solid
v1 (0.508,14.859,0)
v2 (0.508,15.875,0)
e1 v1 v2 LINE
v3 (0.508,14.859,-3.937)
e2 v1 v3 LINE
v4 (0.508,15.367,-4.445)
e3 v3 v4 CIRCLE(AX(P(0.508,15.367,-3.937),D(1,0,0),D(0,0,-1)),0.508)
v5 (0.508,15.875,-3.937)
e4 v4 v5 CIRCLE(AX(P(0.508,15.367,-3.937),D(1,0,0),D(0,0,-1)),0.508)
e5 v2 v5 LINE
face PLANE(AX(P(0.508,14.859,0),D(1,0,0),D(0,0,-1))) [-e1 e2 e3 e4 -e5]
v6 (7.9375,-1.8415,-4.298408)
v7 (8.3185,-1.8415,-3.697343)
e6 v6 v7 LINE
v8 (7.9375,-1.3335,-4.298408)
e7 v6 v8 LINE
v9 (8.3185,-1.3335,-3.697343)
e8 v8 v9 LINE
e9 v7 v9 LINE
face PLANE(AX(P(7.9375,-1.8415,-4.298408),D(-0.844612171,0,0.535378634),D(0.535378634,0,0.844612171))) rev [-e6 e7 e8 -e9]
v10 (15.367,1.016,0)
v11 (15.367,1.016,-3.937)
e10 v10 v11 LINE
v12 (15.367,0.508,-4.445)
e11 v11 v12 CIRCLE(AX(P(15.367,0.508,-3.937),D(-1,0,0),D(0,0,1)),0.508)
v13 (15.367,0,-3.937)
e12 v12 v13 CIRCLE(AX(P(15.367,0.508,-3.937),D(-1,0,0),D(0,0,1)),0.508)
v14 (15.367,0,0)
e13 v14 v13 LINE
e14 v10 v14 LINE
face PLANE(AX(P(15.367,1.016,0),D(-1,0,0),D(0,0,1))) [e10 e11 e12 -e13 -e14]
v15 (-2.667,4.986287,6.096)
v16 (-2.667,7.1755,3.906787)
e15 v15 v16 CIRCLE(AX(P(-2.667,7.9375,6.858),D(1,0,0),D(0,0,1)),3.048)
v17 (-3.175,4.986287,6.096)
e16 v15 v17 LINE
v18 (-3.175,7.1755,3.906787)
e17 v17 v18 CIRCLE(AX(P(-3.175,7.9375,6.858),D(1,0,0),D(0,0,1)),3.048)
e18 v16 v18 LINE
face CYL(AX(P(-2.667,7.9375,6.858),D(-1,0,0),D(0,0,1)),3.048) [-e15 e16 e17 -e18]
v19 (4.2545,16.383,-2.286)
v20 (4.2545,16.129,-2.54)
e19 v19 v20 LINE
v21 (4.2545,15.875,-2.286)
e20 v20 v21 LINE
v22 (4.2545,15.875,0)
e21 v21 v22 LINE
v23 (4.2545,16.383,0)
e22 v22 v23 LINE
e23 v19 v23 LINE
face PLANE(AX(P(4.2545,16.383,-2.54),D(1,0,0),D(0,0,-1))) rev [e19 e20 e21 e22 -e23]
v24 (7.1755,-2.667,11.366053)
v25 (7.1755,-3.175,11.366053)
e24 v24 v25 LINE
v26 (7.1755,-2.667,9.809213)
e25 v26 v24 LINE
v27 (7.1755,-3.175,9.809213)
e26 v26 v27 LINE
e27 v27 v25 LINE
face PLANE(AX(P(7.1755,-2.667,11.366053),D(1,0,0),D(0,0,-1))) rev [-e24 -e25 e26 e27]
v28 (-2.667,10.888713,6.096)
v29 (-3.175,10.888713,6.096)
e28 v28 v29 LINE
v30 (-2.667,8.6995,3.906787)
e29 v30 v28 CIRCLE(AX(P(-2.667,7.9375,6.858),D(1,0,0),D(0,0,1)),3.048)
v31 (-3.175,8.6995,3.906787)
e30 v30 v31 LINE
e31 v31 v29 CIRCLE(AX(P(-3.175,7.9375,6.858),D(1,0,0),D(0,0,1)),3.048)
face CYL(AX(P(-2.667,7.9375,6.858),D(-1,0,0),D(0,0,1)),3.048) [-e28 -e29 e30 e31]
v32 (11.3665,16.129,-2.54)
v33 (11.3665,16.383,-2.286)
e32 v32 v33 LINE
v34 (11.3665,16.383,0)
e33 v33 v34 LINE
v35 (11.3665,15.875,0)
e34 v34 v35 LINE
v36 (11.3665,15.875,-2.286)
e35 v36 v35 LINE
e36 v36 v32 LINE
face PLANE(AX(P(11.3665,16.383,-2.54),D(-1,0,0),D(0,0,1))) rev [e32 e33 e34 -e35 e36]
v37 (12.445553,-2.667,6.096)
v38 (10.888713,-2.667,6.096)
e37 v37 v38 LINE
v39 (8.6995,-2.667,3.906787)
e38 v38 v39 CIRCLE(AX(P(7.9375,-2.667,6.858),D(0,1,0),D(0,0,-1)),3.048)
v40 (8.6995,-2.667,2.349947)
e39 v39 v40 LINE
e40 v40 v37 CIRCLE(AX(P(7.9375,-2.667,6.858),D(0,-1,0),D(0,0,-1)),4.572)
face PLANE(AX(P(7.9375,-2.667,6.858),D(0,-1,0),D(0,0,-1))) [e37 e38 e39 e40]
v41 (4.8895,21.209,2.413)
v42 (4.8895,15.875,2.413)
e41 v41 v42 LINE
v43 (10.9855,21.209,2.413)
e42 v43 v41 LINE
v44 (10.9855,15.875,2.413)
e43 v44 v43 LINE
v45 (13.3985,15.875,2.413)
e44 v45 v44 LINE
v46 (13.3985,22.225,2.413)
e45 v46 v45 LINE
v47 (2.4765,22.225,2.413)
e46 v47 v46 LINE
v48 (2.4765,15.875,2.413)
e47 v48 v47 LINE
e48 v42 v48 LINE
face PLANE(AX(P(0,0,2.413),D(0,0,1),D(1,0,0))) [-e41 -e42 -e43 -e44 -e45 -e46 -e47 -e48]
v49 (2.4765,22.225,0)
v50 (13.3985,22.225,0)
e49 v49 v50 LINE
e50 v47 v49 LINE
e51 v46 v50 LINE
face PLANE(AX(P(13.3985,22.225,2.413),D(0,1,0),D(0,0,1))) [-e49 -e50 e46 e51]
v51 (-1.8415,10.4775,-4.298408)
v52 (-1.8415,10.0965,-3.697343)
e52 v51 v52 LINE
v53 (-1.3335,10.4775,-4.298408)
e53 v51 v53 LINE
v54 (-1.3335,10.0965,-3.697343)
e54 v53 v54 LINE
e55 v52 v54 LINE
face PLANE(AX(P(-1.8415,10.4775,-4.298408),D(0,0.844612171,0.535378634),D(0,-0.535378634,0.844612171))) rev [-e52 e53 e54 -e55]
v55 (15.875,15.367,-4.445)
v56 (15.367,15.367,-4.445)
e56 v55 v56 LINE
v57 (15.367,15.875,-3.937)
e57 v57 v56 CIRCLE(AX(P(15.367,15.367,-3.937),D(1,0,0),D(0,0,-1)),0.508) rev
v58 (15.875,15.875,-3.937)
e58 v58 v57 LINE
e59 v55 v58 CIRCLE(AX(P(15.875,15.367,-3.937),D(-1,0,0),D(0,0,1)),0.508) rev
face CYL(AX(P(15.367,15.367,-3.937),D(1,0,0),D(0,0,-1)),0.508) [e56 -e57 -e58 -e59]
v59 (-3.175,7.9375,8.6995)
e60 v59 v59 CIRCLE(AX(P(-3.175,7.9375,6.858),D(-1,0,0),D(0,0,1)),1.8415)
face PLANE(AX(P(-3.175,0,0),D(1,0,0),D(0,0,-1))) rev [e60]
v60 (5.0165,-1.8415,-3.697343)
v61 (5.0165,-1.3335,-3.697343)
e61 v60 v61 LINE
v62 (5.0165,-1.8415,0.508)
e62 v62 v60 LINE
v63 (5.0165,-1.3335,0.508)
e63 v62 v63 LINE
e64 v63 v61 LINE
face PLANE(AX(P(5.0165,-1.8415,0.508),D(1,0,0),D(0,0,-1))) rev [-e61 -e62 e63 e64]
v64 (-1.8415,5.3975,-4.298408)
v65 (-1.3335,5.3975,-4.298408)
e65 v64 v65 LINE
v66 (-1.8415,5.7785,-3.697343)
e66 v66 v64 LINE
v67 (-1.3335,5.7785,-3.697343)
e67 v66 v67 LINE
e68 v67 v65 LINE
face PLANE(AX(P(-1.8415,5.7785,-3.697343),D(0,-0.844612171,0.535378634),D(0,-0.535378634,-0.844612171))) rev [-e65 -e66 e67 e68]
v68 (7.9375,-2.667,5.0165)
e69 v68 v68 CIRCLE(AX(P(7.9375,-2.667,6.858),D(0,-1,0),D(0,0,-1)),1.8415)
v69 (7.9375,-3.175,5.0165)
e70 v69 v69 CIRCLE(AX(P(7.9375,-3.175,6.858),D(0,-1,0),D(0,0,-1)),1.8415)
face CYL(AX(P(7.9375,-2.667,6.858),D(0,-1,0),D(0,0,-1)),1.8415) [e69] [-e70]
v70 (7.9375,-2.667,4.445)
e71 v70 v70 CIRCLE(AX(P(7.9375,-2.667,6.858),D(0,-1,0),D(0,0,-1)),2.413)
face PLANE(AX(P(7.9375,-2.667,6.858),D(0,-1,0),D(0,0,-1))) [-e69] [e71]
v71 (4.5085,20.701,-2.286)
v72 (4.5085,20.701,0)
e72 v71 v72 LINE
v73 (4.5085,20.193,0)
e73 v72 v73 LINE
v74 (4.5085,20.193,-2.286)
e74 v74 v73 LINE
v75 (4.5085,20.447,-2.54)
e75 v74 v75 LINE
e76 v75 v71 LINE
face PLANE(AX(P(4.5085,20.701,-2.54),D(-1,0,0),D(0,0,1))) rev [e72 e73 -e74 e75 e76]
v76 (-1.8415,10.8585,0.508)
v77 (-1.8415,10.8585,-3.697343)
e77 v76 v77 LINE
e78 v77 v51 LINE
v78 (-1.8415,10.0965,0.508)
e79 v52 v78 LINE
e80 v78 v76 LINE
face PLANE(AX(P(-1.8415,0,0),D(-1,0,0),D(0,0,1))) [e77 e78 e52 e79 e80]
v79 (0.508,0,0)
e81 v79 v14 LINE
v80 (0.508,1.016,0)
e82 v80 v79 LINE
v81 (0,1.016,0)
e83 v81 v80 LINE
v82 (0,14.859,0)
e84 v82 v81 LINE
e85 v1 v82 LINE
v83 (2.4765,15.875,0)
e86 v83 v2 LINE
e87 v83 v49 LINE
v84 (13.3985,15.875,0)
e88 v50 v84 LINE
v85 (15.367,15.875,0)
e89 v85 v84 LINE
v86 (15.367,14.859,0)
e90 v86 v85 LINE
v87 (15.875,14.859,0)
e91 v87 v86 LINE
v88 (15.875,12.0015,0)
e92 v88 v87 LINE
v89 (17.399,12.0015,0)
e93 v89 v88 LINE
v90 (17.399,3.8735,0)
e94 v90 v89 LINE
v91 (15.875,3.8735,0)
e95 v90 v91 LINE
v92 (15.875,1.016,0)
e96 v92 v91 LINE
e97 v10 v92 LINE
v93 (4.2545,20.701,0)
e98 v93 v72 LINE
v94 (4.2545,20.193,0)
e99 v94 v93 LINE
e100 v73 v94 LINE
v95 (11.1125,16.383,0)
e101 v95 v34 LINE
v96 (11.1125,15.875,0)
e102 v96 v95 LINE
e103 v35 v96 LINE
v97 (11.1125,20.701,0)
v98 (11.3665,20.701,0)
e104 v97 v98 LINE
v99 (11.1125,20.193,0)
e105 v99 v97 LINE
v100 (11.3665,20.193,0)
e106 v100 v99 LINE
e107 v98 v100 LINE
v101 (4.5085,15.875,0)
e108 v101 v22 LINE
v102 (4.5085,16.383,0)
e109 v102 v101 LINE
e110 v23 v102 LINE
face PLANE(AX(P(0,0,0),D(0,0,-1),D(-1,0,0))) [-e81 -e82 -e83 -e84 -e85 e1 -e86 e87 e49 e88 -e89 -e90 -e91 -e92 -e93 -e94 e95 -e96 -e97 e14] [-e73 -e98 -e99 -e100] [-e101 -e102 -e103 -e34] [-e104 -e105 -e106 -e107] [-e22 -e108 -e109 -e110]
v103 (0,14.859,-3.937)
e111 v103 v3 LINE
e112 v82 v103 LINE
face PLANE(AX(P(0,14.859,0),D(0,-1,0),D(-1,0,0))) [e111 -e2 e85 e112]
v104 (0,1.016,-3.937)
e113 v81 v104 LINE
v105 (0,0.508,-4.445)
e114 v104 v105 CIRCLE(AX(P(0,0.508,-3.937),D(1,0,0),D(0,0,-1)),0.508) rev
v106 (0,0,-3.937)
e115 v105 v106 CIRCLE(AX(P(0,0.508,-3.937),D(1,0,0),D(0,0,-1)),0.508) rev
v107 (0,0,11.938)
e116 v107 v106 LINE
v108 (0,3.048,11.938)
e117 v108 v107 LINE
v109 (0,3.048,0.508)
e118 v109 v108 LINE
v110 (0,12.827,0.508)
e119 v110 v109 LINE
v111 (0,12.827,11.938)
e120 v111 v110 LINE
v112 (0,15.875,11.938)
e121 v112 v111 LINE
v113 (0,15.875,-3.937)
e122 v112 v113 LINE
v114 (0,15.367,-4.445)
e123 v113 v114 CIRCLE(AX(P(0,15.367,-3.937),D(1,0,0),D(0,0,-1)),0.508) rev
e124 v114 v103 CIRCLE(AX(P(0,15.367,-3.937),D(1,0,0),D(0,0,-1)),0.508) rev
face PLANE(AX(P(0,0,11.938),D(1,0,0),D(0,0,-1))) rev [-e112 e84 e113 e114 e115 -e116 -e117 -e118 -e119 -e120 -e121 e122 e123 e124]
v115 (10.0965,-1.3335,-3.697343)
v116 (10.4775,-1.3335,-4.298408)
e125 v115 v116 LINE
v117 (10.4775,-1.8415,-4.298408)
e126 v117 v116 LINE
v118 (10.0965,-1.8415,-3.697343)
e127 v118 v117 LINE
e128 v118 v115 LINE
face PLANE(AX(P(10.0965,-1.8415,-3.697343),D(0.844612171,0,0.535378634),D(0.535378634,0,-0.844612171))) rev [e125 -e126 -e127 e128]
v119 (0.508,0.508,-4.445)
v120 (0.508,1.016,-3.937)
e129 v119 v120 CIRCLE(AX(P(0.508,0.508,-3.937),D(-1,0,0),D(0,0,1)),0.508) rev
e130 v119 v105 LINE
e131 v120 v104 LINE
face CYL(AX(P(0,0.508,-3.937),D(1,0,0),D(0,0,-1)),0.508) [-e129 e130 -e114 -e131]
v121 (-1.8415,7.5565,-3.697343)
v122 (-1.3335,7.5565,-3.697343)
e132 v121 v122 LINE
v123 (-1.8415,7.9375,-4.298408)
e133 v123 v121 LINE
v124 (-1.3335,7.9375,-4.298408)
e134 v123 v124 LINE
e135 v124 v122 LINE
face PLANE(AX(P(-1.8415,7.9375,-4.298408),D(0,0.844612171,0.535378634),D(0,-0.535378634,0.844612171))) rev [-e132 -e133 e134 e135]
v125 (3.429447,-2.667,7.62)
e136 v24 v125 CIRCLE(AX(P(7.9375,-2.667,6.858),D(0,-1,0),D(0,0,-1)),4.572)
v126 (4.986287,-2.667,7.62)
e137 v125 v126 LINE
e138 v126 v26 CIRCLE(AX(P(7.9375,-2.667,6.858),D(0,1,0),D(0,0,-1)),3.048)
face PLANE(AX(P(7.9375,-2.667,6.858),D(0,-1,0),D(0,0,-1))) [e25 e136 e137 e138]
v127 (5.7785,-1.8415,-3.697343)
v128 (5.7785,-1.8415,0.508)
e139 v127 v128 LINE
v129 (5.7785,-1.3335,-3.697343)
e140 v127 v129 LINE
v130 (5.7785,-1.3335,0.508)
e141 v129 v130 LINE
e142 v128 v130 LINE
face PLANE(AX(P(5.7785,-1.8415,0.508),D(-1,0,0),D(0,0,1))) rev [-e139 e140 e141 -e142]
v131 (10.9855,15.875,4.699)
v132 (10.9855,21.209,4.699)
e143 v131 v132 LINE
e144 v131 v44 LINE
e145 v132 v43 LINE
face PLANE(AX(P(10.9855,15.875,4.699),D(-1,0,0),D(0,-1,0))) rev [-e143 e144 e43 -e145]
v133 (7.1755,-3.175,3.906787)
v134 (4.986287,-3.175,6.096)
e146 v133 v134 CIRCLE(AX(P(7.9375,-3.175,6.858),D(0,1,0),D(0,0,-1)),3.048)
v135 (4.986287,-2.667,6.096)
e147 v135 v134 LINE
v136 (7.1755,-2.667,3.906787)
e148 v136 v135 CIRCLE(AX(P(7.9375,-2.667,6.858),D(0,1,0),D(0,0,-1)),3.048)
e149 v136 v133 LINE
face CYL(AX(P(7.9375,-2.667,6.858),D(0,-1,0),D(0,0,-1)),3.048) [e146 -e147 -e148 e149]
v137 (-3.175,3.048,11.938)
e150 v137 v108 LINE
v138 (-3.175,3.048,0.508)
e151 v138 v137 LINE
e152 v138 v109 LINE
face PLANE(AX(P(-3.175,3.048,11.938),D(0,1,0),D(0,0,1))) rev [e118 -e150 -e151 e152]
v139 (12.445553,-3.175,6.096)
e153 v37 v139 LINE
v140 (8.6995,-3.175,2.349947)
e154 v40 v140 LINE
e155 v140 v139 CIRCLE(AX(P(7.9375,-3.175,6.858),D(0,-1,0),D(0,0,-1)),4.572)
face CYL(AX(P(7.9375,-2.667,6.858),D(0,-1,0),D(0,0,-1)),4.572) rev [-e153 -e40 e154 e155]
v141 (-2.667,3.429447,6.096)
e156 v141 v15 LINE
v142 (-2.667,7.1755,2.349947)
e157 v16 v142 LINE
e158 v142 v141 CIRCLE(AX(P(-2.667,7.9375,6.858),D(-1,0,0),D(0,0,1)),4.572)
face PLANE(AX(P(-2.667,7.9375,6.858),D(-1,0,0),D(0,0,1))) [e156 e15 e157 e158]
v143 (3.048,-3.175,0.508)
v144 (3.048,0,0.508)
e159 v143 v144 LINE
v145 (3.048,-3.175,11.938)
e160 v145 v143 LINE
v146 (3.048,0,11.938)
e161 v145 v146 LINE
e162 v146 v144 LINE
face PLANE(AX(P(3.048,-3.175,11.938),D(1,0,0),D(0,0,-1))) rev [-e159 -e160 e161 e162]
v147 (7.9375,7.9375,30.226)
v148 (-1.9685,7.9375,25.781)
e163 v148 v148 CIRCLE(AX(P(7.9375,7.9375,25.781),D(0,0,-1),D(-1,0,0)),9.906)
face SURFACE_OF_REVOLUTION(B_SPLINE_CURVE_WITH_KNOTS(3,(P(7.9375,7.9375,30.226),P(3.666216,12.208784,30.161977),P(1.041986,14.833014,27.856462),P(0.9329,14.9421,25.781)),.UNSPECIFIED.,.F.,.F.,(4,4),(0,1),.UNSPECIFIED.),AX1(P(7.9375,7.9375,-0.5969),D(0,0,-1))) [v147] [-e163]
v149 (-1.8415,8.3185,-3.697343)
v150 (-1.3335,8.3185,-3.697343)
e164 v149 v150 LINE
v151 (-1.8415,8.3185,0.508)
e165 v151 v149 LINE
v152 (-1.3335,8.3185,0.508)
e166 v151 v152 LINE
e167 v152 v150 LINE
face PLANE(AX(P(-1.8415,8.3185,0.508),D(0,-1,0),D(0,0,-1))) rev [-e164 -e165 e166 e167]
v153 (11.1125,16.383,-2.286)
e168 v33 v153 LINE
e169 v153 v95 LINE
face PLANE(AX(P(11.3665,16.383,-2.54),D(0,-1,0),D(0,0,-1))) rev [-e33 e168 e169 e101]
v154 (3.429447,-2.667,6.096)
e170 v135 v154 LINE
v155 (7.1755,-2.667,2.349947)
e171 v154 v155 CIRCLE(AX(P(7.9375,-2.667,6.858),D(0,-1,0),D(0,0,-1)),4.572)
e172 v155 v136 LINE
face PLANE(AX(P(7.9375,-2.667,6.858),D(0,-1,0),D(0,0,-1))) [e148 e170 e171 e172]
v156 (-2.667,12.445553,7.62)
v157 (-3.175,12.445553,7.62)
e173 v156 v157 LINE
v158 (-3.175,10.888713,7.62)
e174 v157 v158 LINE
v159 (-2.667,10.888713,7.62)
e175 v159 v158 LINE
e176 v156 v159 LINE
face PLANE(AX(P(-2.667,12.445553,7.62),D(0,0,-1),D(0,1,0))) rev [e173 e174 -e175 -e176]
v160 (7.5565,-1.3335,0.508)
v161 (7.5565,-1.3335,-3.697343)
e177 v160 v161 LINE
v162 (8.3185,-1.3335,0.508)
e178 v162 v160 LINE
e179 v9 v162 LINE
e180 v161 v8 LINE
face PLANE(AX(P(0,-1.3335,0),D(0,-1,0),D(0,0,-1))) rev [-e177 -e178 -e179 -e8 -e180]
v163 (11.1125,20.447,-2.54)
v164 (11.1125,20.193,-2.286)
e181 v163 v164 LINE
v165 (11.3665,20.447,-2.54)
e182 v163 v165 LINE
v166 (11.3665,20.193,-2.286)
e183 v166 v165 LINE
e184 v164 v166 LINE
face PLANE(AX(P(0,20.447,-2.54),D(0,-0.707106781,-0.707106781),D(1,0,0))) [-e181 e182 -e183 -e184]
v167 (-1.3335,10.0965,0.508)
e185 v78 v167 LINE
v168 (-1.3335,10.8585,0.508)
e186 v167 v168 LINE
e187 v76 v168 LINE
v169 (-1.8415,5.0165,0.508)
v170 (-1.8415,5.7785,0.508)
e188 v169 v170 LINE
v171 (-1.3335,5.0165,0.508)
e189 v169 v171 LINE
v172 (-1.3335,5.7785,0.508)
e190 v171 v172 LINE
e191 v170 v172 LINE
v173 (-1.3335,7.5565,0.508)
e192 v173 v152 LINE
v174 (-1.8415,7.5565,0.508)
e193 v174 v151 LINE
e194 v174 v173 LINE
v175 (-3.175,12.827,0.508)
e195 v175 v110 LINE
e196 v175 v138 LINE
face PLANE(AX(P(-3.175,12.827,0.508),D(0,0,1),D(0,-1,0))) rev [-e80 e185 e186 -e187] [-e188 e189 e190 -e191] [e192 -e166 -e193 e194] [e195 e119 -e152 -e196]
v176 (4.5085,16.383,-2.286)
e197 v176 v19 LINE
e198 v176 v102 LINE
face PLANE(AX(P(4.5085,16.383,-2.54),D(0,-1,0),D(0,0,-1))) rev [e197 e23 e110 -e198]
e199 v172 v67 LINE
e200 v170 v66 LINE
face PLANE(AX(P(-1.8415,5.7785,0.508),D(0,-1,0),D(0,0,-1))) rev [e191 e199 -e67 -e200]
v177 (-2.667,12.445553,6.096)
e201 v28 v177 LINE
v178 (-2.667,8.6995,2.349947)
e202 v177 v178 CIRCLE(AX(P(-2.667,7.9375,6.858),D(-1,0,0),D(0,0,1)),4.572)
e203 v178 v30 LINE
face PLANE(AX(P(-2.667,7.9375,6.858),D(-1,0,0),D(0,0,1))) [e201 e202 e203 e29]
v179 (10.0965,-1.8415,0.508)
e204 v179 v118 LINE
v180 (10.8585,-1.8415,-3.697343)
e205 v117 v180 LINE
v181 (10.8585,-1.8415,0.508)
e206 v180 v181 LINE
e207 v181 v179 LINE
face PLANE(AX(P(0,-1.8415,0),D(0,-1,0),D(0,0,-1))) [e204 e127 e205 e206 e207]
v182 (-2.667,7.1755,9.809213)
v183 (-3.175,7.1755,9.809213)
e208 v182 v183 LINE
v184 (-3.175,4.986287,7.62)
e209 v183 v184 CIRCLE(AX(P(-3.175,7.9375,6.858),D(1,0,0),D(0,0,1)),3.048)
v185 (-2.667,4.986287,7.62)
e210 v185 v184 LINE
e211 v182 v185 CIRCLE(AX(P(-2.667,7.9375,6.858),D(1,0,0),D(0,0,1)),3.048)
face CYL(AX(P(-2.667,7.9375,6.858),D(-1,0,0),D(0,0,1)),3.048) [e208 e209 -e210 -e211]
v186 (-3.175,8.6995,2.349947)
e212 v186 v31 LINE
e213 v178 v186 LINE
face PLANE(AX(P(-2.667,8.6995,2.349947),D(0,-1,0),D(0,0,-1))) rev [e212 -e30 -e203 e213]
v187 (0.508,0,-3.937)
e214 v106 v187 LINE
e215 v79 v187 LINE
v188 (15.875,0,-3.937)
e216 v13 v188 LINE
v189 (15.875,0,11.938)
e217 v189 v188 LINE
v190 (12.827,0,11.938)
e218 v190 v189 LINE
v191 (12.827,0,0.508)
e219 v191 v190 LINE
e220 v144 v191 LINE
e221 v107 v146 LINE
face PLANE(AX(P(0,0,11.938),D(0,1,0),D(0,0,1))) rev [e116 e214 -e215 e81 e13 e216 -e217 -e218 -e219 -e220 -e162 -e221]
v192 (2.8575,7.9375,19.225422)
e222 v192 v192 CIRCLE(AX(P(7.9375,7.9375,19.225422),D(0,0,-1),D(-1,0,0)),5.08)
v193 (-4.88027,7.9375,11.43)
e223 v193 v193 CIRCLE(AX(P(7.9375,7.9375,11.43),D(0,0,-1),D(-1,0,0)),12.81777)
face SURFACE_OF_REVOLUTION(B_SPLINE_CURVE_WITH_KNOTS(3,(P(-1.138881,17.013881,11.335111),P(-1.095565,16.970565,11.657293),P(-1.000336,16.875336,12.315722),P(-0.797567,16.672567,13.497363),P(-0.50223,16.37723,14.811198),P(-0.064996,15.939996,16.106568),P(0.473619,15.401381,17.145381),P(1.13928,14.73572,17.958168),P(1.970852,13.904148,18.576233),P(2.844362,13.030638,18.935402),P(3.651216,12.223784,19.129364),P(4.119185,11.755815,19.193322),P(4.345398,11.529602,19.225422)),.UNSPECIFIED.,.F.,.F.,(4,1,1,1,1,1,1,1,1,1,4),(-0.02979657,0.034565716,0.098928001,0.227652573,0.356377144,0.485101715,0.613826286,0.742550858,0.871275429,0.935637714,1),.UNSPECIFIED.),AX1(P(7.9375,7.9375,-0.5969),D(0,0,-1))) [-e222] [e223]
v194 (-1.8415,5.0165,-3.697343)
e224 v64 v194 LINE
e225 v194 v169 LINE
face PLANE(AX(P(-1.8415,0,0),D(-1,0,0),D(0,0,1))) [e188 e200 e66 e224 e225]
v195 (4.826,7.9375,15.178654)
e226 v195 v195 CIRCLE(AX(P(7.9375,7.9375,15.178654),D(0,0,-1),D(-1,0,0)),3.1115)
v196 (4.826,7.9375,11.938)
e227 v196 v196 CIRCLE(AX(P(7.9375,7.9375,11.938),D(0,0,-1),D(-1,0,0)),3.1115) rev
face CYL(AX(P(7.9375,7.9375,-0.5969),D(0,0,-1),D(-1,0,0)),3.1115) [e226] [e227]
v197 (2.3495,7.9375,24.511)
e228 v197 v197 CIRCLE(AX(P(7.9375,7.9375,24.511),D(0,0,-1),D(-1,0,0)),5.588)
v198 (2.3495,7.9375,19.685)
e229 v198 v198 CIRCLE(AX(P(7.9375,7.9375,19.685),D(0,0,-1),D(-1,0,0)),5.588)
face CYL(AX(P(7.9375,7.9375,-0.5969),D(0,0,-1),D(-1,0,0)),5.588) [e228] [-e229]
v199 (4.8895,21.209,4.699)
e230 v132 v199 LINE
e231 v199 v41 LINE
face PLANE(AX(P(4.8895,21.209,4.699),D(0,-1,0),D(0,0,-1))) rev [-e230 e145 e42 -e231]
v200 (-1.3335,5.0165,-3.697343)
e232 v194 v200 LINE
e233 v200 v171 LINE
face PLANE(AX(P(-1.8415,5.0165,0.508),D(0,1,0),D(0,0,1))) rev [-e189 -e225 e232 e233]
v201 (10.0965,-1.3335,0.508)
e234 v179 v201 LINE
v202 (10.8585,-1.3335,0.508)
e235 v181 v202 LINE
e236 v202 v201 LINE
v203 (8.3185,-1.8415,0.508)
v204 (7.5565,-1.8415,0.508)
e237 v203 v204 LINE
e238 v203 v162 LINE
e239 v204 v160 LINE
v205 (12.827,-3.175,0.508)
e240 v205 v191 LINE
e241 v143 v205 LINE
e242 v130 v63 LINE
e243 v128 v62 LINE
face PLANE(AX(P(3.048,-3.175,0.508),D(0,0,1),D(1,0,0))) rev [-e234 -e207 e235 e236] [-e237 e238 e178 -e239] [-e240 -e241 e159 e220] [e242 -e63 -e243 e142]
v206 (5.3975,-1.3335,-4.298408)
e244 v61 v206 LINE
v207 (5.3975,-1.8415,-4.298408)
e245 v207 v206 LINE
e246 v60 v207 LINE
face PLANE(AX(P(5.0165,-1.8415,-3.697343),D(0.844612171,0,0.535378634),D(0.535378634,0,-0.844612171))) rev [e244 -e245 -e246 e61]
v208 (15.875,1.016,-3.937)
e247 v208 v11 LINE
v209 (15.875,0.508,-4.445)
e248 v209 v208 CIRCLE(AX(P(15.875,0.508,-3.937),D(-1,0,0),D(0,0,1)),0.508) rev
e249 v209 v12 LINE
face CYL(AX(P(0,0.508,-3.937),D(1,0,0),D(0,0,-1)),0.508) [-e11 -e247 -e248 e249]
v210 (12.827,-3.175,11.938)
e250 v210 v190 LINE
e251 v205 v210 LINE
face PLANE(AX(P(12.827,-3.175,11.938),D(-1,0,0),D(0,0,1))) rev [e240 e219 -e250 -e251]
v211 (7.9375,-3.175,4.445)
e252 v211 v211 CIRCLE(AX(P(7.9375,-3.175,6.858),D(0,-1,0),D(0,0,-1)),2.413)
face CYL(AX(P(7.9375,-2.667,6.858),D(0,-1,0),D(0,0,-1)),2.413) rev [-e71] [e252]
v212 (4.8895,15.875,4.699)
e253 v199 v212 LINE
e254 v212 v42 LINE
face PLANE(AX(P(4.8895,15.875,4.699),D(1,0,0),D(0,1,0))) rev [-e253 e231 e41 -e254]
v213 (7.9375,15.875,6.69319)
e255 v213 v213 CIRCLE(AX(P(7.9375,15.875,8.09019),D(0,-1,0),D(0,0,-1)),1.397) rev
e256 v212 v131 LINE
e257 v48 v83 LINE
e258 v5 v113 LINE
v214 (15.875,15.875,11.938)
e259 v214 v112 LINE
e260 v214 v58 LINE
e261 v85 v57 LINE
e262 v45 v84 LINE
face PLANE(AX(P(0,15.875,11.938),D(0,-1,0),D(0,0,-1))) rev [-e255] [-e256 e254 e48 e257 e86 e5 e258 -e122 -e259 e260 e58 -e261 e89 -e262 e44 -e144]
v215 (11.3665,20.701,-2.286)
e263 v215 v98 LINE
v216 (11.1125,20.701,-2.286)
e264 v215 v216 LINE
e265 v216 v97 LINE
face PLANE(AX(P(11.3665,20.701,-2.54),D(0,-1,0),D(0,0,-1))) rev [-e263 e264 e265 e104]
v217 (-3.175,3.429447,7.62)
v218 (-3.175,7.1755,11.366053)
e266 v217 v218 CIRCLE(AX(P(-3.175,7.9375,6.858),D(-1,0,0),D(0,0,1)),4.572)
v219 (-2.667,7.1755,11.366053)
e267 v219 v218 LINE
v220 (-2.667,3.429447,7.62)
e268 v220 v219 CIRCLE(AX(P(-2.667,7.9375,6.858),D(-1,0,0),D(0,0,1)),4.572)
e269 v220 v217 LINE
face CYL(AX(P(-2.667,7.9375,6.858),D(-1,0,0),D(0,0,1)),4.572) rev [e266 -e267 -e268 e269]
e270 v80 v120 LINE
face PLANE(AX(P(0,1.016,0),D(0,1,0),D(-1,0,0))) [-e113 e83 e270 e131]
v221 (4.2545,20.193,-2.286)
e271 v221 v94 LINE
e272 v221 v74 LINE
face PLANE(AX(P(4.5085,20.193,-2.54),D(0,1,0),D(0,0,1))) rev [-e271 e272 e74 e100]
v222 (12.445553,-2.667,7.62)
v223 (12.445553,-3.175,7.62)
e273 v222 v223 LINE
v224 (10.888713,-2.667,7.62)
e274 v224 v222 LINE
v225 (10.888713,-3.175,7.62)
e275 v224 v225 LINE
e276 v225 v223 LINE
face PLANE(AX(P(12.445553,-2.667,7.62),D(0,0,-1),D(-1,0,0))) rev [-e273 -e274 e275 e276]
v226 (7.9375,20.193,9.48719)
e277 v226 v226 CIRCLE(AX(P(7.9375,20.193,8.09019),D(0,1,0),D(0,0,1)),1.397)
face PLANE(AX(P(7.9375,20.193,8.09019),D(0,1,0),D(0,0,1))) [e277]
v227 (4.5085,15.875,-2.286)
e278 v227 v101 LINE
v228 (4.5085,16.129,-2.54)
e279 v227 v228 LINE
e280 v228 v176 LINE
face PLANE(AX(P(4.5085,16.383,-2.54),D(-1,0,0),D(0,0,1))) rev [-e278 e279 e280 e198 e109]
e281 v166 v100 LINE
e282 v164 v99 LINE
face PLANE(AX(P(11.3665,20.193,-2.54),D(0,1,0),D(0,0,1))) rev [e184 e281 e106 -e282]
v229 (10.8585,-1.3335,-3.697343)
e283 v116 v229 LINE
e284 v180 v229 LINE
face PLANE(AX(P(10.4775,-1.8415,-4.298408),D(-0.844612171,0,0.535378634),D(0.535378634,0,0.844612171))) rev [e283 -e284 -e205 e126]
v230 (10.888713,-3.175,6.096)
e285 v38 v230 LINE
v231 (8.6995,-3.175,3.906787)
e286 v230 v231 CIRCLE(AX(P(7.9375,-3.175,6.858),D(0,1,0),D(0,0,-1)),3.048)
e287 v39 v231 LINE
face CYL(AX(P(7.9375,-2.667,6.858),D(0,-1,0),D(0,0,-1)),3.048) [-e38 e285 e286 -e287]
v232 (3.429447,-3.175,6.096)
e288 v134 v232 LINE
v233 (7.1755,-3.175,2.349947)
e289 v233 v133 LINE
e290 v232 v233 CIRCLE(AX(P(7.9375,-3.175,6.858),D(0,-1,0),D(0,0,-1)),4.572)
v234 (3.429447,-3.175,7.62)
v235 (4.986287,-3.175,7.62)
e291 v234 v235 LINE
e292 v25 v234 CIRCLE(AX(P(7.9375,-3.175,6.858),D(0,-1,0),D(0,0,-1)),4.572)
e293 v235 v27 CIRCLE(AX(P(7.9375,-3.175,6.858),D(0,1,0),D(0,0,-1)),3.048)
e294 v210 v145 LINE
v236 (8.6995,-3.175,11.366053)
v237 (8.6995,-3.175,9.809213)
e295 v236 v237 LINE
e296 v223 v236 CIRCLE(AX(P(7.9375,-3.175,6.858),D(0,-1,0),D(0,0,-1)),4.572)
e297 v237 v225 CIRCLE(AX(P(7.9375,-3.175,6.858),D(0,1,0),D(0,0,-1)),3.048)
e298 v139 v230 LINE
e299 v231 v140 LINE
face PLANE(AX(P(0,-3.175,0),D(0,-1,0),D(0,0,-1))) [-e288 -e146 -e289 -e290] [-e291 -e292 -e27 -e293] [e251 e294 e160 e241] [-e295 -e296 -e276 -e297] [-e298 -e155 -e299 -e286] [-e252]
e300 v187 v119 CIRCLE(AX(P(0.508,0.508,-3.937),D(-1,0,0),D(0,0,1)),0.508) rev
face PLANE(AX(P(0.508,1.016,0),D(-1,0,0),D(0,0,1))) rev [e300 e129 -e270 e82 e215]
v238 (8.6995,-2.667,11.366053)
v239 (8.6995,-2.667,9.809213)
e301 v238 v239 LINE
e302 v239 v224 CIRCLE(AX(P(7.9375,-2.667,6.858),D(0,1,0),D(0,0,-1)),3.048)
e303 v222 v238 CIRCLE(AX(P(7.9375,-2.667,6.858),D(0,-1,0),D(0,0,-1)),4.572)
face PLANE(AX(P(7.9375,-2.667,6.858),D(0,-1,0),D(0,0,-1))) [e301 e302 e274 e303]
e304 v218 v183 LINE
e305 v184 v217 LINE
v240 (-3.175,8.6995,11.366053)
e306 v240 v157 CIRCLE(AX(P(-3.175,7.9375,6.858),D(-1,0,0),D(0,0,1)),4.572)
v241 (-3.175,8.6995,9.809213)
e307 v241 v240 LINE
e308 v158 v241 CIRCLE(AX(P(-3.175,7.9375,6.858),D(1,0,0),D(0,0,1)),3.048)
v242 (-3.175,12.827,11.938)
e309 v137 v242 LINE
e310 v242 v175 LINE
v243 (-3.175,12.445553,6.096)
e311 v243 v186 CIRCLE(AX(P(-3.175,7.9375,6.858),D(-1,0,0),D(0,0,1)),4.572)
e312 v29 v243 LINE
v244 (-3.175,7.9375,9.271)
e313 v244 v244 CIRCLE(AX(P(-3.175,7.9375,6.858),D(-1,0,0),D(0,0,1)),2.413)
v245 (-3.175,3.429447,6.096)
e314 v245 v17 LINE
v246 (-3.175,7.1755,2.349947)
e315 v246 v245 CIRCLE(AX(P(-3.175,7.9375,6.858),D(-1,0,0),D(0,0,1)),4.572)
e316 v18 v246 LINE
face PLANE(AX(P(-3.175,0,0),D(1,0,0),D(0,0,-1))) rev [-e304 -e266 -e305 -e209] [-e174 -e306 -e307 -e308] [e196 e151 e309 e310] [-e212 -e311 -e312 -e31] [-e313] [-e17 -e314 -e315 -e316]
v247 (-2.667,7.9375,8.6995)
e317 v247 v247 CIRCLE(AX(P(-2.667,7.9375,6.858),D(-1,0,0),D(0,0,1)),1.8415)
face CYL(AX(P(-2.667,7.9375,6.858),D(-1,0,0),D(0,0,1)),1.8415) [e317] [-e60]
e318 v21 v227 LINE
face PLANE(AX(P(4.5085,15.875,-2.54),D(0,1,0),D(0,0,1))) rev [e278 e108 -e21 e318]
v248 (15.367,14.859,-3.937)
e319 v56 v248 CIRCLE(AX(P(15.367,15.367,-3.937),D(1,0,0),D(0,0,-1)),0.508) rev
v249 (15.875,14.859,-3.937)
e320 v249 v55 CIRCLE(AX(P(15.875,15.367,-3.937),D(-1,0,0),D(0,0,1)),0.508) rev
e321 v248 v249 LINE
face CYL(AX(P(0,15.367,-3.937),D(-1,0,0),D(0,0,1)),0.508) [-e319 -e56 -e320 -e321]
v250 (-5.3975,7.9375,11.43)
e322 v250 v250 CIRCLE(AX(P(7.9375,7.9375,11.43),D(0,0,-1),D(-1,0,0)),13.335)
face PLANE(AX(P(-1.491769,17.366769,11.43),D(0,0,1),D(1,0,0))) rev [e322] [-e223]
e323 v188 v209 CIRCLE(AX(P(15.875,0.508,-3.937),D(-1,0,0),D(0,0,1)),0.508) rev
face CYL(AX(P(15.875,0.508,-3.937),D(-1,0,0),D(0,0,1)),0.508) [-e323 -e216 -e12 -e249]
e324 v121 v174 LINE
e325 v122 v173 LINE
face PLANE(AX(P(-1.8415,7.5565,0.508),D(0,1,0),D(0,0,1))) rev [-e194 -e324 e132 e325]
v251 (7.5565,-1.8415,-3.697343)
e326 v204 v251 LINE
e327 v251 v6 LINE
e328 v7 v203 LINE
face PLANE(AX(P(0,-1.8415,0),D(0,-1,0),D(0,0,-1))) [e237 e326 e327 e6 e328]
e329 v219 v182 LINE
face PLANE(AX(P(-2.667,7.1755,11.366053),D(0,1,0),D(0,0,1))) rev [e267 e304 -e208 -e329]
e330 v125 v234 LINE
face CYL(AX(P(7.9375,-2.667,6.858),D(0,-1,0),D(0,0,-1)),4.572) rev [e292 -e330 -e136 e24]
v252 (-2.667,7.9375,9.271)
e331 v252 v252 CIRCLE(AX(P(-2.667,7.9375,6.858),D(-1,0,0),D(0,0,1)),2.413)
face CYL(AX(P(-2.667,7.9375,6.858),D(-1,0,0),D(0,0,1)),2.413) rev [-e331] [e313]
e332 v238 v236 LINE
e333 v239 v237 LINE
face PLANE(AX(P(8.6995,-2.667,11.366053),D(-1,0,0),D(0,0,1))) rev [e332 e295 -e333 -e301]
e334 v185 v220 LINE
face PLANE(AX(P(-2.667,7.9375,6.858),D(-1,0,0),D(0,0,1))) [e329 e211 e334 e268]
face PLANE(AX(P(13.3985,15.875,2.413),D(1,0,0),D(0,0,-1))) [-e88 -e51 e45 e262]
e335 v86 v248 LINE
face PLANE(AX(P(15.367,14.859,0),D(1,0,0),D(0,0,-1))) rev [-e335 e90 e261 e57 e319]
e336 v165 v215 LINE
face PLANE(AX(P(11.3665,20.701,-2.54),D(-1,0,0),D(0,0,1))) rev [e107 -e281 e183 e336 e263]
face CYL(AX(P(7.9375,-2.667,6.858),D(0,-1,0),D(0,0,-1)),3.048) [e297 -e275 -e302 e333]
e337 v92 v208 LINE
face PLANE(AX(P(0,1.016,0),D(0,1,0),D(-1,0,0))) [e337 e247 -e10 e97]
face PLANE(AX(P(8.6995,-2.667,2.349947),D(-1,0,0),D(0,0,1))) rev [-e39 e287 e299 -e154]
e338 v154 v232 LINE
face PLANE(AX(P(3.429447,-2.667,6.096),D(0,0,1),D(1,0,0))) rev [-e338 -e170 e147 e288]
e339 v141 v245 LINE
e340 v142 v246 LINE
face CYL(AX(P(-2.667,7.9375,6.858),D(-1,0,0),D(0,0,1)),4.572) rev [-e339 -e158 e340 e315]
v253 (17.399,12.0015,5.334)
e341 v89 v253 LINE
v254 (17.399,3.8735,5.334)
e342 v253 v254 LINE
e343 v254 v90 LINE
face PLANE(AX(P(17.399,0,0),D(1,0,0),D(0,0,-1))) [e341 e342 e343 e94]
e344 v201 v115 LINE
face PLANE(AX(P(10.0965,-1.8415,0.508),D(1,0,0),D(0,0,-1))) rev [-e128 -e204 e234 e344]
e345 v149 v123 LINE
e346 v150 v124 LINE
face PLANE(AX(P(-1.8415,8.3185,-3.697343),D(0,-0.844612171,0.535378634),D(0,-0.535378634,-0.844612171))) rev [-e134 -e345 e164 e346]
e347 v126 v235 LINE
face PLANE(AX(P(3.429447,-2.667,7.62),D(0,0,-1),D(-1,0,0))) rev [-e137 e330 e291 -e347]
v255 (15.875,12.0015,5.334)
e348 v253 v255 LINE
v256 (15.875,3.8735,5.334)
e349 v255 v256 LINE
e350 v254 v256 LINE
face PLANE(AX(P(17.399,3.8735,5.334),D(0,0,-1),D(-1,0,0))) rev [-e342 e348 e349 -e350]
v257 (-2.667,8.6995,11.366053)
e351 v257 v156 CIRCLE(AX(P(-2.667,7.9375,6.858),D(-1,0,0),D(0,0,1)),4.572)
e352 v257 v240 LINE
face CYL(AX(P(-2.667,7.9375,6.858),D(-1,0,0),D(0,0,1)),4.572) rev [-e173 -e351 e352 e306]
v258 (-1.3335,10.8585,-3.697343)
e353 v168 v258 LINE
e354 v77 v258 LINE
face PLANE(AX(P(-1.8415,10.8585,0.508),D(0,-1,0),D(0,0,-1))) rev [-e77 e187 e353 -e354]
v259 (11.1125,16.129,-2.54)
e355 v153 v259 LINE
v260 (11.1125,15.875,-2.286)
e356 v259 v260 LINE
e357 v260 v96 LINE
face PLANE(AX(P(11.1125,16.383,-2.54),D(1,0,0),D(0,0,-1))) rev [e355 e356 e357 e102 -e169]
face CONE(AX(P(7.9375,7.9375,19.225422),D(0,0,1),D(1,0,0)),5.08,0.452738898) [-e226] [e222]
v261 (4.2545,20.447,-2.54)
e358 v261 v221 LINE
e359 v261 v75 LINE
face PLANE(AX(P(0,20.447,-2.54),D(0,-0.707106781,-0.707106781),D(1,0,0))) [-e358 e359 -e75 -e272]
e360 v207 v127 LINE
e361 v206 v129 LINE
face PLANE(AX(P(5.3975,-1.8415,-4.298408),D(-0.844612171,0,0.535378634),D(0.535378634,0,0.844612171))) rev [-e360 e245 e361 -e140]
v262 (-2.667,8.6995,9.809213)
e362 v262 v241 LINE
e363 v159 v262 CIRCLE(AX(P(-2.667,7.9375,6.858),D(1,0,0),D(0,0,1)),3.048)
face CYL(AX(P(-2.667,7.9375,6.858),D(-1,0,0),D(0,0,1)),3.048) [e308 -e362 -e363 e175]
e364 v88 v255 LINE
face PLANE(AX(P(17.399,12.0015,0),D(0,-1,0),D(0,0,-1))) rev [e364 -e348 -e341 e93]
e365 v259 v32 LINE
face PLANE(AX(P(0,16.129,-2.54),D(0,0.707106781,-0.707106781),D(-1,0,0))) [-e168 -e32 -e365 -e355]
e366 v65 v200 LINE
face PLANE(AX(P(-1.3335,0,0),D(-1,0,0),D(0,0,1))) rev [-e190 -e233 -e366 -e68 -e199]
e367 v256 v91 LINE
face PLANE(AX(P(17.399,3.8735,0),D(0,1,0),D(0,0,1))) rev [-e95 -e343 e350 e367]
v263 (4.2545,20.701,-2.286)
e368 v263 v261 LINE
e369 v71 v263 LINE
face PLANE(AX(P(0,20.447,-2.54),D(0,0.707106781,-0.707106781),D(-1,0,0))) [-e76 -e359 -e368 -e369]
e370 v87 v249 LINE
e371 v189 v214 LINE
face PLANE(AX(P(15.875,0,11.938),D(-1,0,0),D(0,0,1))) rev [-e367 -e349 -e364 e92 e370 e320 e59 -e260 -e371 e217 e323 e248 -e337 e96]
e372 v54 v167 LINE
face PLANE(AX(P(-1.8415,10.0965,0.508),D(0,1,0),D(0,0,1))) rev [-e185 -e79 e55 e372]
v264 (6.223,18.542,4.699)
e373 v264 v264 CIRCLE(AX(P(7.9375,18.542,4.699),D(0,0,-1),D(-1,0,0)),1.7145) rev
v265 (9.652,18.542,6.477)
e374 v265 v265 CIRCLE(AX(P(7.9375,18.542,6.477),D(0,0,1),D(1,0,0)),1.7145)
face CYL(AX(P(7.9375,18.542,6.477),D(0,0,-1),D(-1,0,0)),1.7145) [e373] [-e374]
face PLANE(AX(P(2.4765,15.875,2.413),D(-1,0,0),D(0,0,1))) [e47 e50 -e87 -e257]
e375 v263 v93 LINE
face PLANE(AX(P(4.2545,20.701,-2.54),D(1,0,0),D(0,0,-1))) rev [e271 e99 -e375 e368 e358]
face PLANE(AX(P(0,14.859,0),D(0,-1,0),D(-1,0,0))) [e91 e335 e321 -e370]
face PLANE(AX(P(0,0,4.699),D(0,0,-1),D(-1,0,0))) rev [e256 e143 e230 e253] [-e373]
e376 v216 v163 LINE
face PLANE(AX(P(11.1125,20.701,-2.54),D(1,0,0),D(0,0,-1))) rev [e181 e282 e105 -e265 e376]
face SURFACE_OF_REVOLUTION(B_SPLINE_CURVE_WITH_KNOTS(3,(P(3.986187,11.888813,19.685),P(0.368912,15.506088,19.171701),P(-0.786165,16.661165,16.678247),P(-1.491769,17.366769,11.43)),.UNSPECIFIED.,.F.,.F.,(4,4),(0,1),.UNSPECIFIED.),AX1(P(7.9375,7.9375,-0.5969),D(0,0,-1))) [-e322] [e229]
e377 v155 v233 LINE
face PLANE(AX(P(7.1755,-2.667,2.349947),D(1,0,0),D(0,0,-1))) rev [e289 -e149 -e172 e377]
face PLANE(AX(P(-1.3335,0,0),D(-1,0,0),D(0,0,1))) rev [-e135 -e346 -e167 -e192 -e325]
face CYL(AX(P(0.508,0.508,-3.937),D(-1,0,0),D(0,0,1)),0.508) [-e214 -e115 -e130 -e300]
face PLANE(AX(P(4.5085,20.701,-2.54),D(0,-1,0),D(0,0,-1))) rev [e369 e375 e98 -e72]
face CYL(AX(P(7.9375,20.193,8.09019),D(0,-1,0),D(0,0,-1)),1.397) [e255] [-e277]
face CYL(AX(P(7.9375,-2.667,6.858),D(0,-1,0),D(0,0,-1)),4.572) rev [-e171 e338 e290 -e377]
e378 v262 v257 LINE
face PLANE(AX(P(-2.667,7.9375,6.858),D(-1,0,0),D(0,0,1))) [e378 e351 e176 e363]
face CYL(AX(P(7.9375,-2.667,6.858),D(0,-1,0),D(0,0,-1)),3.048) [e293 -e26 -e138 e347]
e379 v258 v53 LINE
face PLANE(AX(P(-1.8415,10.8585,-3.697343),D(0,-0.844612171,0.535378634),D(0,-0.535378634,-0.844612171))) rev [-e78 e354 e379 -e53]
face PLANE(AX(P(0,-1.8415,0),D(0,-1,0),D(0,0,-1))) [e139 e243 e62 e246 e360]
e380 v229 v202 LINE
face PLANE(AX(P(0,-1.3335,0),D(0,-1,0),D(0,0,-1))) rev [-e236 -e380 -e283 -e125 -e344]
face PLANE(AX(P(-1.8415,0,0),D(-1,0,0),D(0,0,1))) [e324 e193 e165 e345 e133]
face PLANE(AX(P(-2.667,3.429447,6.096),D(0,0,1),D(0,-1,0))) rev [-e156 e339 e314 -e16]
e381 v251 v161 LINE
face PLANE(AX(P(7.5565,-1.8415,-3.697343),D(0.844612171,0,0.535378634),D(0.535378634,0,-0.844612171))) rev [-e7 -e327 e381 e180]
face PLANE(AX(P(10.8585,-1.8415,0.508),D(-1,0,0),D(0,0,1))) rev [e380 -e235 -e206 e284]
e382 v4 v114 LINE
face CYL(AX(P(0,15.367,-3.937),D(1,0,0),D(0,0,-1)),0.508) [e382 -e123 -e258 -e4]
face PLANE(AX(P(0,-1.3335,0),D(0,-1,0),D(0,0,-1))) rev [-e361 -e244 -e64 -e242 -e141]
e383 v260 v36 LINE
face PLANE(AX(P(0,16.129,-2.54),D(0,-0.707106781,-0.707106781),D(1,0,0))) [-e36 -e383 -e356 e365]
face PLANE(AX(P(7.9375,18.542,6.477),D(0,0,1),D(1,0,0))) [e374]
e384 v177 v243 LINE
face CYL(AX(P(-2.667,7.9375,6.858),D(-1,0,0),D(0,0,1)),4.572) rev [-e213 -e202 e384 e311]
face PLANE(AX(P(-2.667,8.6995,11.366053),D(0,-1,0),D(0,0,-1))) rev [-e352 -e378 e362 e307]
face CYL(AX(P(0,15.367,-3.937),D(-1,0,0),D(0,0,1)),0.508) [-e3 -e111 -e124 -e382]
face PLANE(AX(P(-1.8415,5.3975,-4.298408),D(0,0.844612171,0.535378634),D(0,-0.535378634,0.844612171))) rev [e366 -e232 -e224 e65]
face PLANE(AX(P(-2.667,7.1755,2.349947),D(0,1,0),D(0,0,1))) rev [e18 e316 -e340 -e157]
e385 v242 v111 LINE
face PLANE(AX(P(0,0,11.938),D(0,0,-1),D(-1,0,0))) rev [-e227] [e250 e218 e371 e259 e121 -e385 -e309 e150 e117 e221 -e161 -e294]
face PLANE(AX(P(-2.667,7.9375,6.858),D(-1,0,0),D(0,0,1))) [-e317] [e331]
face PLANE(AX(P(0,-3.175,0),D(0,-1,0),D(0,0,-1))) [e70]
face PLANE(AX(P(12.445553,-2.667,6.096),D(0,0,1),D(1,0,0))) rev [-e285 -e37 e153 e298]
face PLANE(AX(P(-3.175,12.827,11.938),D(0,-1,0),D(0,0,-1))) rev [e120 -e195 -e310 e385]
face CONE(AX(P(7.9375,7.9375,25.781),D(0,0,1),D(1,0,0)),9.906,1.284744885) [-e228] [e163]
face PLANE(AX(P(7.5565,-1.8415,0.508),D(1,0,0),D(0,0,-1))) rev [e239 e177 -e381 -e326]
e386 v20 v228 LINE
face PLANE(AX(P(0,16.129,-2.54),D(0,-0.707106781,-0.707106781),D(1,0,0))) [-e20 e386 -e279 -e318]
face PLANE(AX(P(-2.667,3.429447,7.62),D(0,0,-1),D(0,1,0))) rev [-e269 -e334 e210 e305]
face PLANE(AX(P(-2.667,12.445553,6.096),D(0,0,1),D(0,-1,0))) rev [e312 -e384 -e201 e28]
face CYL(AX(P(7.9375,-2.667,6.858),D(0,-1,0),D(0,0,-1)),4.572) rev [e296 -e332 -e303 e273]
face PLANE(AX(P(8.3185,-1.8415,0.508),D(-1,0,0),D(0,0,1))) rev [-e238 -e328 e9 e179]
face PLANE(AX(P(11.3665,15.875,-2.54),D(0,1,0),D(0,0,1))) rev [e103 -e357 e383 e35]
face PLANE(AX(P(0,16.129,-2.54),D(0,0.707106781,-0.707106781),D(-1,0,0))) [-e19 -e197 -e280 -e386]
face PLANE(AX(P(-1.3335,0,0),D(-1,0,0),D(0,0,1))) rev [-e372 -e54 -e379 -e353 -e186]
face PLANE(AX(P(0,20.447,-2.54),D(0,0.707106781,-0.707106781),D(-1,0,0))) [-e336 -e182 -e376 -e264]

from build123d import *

# Parameters (mm, degrees)
SKETCH1_W            = 15.875
SKETCH1_H            = 15.875
BOSS_EXTRUDE1_DEPTH  = 11.938
SKETCH2_W            = 10.922
SKETCH2_H            = 6.35
BOSS_EXTRUDE2_DEPTH  = 2.413
SKETCH3_W            = 5.334
SKETCH3_H            = 8.128
BOSS_EXTRUDE3_DEPTH  = 1.524
SKETCH4_W            = 6.096
SKETCH4_H            = 5.334
BOSS_EXTRUDE4_DEPTH  = 2.286
SKETCH5_R            = 1.7145
BOSS_EXTRUDE5_DEPTH  = 1.778
SKETCH6_R            = 1.397
BOSS_EXTRUDE6_DEPTH  = 4.318
SKETCH7_W            = 9.779
SKETCH7_H            = 11.43
BOSS_EXTRUDE7_DEPTH  = 3.175
SKETCH8_W            = 11.43
SKETCH8_H            = 9.779
BOSS_EXTRUDE8_DEPTH  = 3.175
SKETCH9_R            = 2.413
SKETCH9_R_2          = 1.8415
CUT_EXTRUDE1_DEPTH   = 0.508
SKETCH10_R           = 2.413
SKETCH10_R_2         = 1.8415
CUT_EXTRUDE2_DEPTH   = 0.508
SKETCH12_W           = 0.508
SKETCH12_H           = 4.445
EXTRUDE_THIN1_DEPTH  = 1.016
SKETCH13_W           = 0.508
SKETCH13_H           = 4.445
EXTRUDE_THIN2_DEPTH  = 1.016
FILLET1_R            = 0.508
BOSS_EXTRUDE9_DEPTH  = 0.254
BOSS_EXTRUDE10_DEPTH = 0.254
SKETCH16_W           = 0.254
SKETCH16_H           = 0.508
BOSS_EXTRUDE11_DEPTH = 2.54
CHAMFER1_SIZE        = 0.254


with BuildPart() as part:
    # Sketch1 → Boss-Extrude1 (new body)
    with BuildSketch(Plane.XY):
        with Locations((7.9375, 7.9375)):
            Rectangle(SKETCH1_W, SKETCH1_H)
    extrude(amount=BOSS_EXTRUDE1_DEPTH)

    # Sketch2 → Boss-Extrude2 (add)
    with BuildSketch(Plane(origin=(0, 0, 0), x_dir=(-1, 0, 0), z_dir=(0, 0, -1))):
        with Locations((-7.9375, 19.05)):
            Rectangle(SKETCH2_W, SKETCH2_H)
    extrude(amount=-BOSS_EXTRUDE2_DEPTH)

    # Sketch3 → Boss-Extrude3 (add)
    with BuildSketch(Plane(origin=(15.875, 0, 0), x_dir=(0, 0, -1), z_dir=(1, 0, 0))):
        with Locations((-2.667, 7.9375)):
            Rectangle(SKETCH3_W, SKETCH3_H)
    extrude(amount=BOSS_EXTRUDE3_DEPTH)

    # Sketch4 → Boss-Extrude4 (add)
    with BuildSketch(Plane.XY.offset(2.413)):
        with Locations((7.9375, 18.542)):
            Rectangle(SKETCH4_W, SKETCH4_H)
    extrude(amount=BOSS_EXTRUDE4_DEPTH)

    # Sketch5 → Boss-Extrude5 (add)
    with BuildSketch(Plane.XY.offset(4.699)):
        with Locations(Location((7.9375, 18.542, 0), (0, 0, 180))):
            Circle(SKETCH5_R)
    extrude(amount=BOSS_EXTRUDE5_DEPTH)

    # Sketch6 → Boss-Extrude6 (add)
    with BuildSketch(Plane(origin=(0, 15.875, 0), x_dir=(1, 0, 0), z_dir=(0, 1, 0))):
        with Locations(Location((7.9375, -8.090189982, 0), (0, 0, 90))):
            Circle(SKETCH6_R)
    extrude(amount=BOSS_EXTRUDE6_DEPTH)



with BuildPart() as body_2:
    # Sketch7 → Boss-Extrude7 (new body)
    with BuildSketch(Plane.XZ):
        with Locations((7.9375, 6.223)):
            Rectangle(SKETCH7_W, SKETCH7_H)
    extrude(amount=BOSS_EXTRUDE7_DEPTH)

    # Sketch10 → Cut-Extrude2 (cut)
    # profile 1 of 5: a face of its own
    with BuildSketch(Plane.XZ.offset(3.175)):
        with Locations(Location((7.9375, 6.858, 0), (0, 0, 270))):
            Circle(SKETCH10_R)
        with Locations(Location((7.9375, 6.858, 0), (0, 0, 270))):
            Circle(SKETCH10_R_2, mode=Mode.SUBTRACT)
    # profile 2 of 5: a face of its own
    with BuildSketch(Plane.XZ.offset(3.175)):
        with BuildLine():
            Line((3.429447205, 7.62), (4.98628669, 7.62))
            ThreePointArc((4.98628669, 7.62), (5.782238531, 9.013261469), (7.1755, 9.80921331))
            Line((7.1755, 9.80921331), (7.1755, 11.366052795))
            ThreePointArc((7.1755, 11.366052795), (4.704607796, 10.090892204), (3.429447205, 7.62))
        make_face()
    # profile 3 of 5: a face of its own
    with BuildSketch(Plane.XZ.offset(3.175)):
        with BuildLine():
            Line((3.429447205, 6.096), (4.98628669, 6.096))
            ThreePointArc((4.98628669, 6.096), (5.782238531, 4.702738531), (7.1755, 3.90678669))
            Line((7.1755, 3.90678669), (7.1755, 2.349947205))
            ThreePointArc((7.1755, 2.349947205), (4.704607796, 3.625107796), (3.429447205, 6.096))
        make_face()
    # profile 4 of 5: a face of its own
    with BuildSketch(Plane.XZ.offset(3.175)):
        with BuildLine():
            Line((8.6995, 11.366052795), (8.6995, 9.80921331))
            ThreePointArc((8.6995, 9.80921331), (10.092761469, 9.013261469), (10.88871331, 7.62))
            Line((10.88871331, 7.62), (12.445552795, 7.62))
            ThreePointArc((12.445552795, 7.62), (11.170392204, 10.090892204), (8.6995, 11.366052795))
        make_face()
    # profile 5 of 5: a face of its own
    with BuildSketch(Plane.XZ.offset(3.175)):
        with BuildLine():
            Line((12.445552795, 6.096), (10.88871331, 6.096))
            ThreePointArc((10.88871331, 6.096), (10.092761469, 4.702738531), (8.6995, 3.90678669))
            Line((8.6995, 3.90678669), (8.6995, 2.349947205))
            ThreePointArc((8.6995, 2.349947205), (11.170392204, 3.625107796), (12.445552795, 6.096))
        make_face()
    extrude(amount=-CUT_EXTRUDE2_DEPTH, mode=Mode.SUBTRACT)


with BuildPart() as body_3:
    # Sketch8 → Boss-Extrude8 (new body)
    with BuildSketch(Plane.ZY):
        with Locations((6.223, 7.9375)):
            Rectangle(SKETCH8_W, SKETCH8_H)
    extrude(amount=BOSS_EXTRUDE8_DEPTH)

    # Sketch9 → Cut-Extrude1 (cut)
    # profile 1 of 5: a face of its own
    with BuildSketch(Plane.ZY.offset(3.175)):
        with Locations((6.858, 7.9375)):
            Circle(SKETCH9_R)
        with Locations((6.858, 7.9375)):
            Circle(SKETCH9_R_2, mode=Mode.SUBTRACT)
    # profile 2 of 5: a face of its own
    with BuildSketch(Plane.ZY.offset(3.175)):
        with BuildLine():
            Line((7.62, 12.445552795), (7.62, 10.88871331))
            ThreePointArc((7.62, 10.88871331), (9.013261469, 10.092761469), (9.80921331, 8.6995))
            Line((9.80921331, 8.6995), (11.366052795, 8.6995))
            ThreePointArc((11.366052795, 8.6995), (10.090892204, 11.170392204), (7.62, 12.445552795))
        make_face()
    # profile 3 of 5: a face of its own
    with BuildSketch(Plane.ZY.offset(3.175)):
        with BuildLine():
            Line((6.096, 12.445552795), (6.096, 10.88871331))
            ThreePointArc((6.096, 10.88871331), (4.702738531, 10.092761469), (3.90678669, 8.6995))
            Line((3.90678669, 8.6995), (2.349947205, 8.6995))
            ThreePointArc((2.349947205, 8.6995), (3.625107796, 11.170392204), (6.096, 12.445552795))
        make_face()
    # profile 4 of 5: a face of its own
    with BuildSketch(Plane.ZY.offset(3.175)):
        with BuildLine():
            Line((11.366052795, 7.1755), (9.80921331, 7.1755))
            ThreePointArc((9.80921331, 7.1755), (9.013261469, 5.782238531), (7.62, 4.98628669))
            Line((7.62, 4.98628669), (7.62, 3.429447205))
            ThreePointArc((7.62, 3.429447205), (10.090892204, 4.704607796), (11.366052795, 7.1755))
        make_face()
    # profile 5 of 5: a face of its own
    with BuildSketch(Plane.ZY.offset(3.175)):
        with BuildLine():
            Line((6.096, 3.429447205), (6.096, 4.98628669))
            ThreePointArc((6.096, 4.98628669), (4.702738531, 5.782238531), (3.90678669, 7.1755))
            Line((3.90678669, 7.1755), (2.349947205, 7.1755))
            ThreePointArc((2.349947205, 7.1755), (3.625107796, 4.704607796), (6.096, 3.429447205))
        make_face()
    extrude(amount=-CUT_EXTRUDE1_DEPTH, mode=Mode.SUBTRACT)


with BuildPart() as part_1:
    add(part.part)

    add(body_3.part)  # Revolve1 merges body 3

    add(body_2.part)  # Revolve1 merges body 2
    # Sketch11 → Revolve1 (revolve)
    with BuildSketch(Plane(origin=(7.9375, 7.9375, 0), x_dir=(-0.7071067811865475, 0.7071067811865477, 0), z_dir=(-0.7071067811865477, -0.7071067811865475, 0)), mode=Mode.PRIVATE) as revolve1_sk:
        with BuildLine():
            Line((0, -11.938), (0, -30.226))
            add(Edge.make_bspline(
                [(9.906, -25.781), (9.751729045, -27.856462125), (6.04050774, -30.161976774), (0, -30.226)],
                knots=[0, 0, 0, 0, 1, 1, 1, 1], degree=3))
            Line((9.906, -25.781), (5.588, -24.511))
            Line((5.588, -24.511), (5.588, -19.685))
            add(Edge.make_bspline(
                [(5.588, -19.685), (10.703599442, -19.17170065), (12.337124929, -16.678247384), (13.335, -11.43)],
                knots=[0, 0, 0, 0, 1, 1, 1, 1], degree=3))
            Line((13.335, -11.43), (12.81776957, -11.43))
            add(Edge.make_bspline(
                [(5.08, -19.225421832), (5.399913167, -19.193321739), (6.061720289, -19.129363969), (7.20278515, -18.93540179), (8.438114269, -18.57623304), (9.614134976, -17.958168192), (10.555522363, -17.145380616), (11.317238514, -16.106567706), (11.935580098, -14.811198195), (12.353250651, -13.497363461), (12.632984775, -12.344667479), (12.761465886, -11.721646833), (12.81776957, -11.43)],
                knots=[-0.02979657, -0.02979657, -0.02979657, -0.02979657, 0.034565716, 0.098928001, 0.227652573, 0.356377144, 0.485101715, 0.613826286, 0.742550858, 0.871275429, 0.935637714, 0.993693442, 0.993693442, 0.993693442, 0.993693442], degree=3))
            Line((5.08, -19.225421832), (3.1115, -15.178653632))
            Line((3.1115, -15.178653632), (3.1115, -11.938))
            Line((3.1115, -11.938), (0, -11.938))
        make_face()
    revolve(revolve1_sk.sketch.rotate(Axis((7.9375, 7.9375, -0.5969), (0, 0, 1)), 45), axis=Axis((7.9375, 7.9375, -0.5969), (0, 0, 1)))

    # Sketch12 → Extrude-Thin1 (add)
    with BuildSketch(Plane.XZ):
        with Locations((0.254, -2.2225)):
            Rectangle(SKETCH12_W, SKETCH12_H)
        with Locations((15.621, -2.2225)):
            Rectangle(SKETCH12_W, SKETCH12_H)
    extrude(amount=-EXTRUDE_THIN1_DEPTH)

    # Sketch13 → Extrude-Thin2 (add)
    with BuildSketch(Plane(origin=(0, 15.875, 0), x_dir=(1, 0, 0), z_dir=(0, 1, 0))):
        with Locations((0.254, 2.2225)):
            Rectangle(SKETCH13_W, SKETCH13_H)
        with Locations((15.621, 2.2225)):
            Rectangle(SKETCH13_W, SKETCH13_H)
    extrude(amount=-EXTRUDE_THIN2_DEPTH)

    # Fillet1
    fillet1_edges = [part_1.edges().sort_by_distance(p)[0] for p in [
        (0.254, 1.016, -4.445),
        (0.254, 15.875, -4.445),
        (0.254, 14.859, -4.445),
        (15.621, 15.875, -4.445),
        (15.621, 14.859, -4.445),
        (15.621, 1.016, -4.445),
        (15.621, 0, -4.445),
        (0.254, 0, -4.445),
    ]]
    fillet(fillet1_edges, radius=FILLET1_R - 0.0001)  # a hair under: the kernel refuses the full size

    # Sketch14 → Boss-Extrude9 (add, symmetric)
    with BuildSketch(Plane(origin=(0, -1.5875, 0), x_dir=(-1, 0, 0), z_dir=(0, -1, 0))):
        Polygon((-10.0965, -0.508), (-10.0965, 3.697342898), (-10.4775, 4.298407671), (-10.8585, 3.697342898), (-10.8585, -0.508), align=None)
        Polygon((-7.5565, -0.508), (-7.5565, 3.697342898), (-7.9375, 4.298407671), (-8.3185, 3.697342898), (-8.3185, -0.508), align=None)
        Polygon((-5.0165, -0.508), (-5.0165, 3.697342898), (-5.3975, 4.298407671), (-5.7785, 3.697342898), (-5.7785, -0.508), align=None)
    extrude(amount=BOSS_EXTRUDE9_DEPTH, both=True)

    # Sketch15 → Boss-Extrude10 (add, symmetric)
    with BuildSketch(Plane.ZY.offset(1.5875)):
        Polygon((0.508, 8.3185), (-3.697342898, 8.3185), (-4.298407671, 7.9375), (-3.697342898, 7.5565), (0.508, 7.5565), align=None)
        Polygon((0.508, 5.7785), (-3.697342898, 5.7785), (-4.298407671, 5.3975), (-3.697342898, 5.0165), (0.508, 5.0165), align=None)
        Polygon((0.508, 10.8585), (-3.697342898, 10.8585), (-4.298407671, 10.4775), (-3.697342898, 10.0965), (0.508, 10.0965), align=None)
    extrude(amount=BOSS_EXTRUDE10_DEPTH, both=True)

    # Sketch16 → Boss-Extrude11 (add)
    with BuildSketch(Plane(origin=(0, 0, 0), x_dir=(-1, 0, 0), z_dir=(0, 0, -1))):
        with Locations((-11.2395, 20.447)):
            Rectangle(SKETCH16_W, SKETCH16_H)
        with Locations((-4.3815, 20.447)):
            Rectangle(SKETCH16_W, SKETCH16_H)
        with Locations((-4.3815, 16.129)):
            Rectangle(SKETCH16_W, SKETCH16_H)
        with Locations((-11.2395, 16.129)):
            Rectangle(SKETCH16_W, SKETCH16_H)
    extrude(amount=BOSS_EXTRUDE11_DEPTH)

    # Chamfer1
    chamfer1_edges = [part_1.edges().sort_by_distance(p)[0] for p in [
        (11.2395, 15.875, -2.54),
        (11.2395, 16.383, -2.54),
        (4.3815, 15.875, -2.54),
        (4.3815, 16.383, -2.54),
        (4.3815, 20.193, -2.54),
        (4.3815, 20.701, -2.54),
        (11.2395, 20.193, -2.54),
        (11.2395, 20.701, -2.54),
    ]]
    chamfer(chamfer1_edges, length=CHAMFER1_SIZE - 0.0001)  # a hair under: the kernel refuses the full size


solid = part_1.part
